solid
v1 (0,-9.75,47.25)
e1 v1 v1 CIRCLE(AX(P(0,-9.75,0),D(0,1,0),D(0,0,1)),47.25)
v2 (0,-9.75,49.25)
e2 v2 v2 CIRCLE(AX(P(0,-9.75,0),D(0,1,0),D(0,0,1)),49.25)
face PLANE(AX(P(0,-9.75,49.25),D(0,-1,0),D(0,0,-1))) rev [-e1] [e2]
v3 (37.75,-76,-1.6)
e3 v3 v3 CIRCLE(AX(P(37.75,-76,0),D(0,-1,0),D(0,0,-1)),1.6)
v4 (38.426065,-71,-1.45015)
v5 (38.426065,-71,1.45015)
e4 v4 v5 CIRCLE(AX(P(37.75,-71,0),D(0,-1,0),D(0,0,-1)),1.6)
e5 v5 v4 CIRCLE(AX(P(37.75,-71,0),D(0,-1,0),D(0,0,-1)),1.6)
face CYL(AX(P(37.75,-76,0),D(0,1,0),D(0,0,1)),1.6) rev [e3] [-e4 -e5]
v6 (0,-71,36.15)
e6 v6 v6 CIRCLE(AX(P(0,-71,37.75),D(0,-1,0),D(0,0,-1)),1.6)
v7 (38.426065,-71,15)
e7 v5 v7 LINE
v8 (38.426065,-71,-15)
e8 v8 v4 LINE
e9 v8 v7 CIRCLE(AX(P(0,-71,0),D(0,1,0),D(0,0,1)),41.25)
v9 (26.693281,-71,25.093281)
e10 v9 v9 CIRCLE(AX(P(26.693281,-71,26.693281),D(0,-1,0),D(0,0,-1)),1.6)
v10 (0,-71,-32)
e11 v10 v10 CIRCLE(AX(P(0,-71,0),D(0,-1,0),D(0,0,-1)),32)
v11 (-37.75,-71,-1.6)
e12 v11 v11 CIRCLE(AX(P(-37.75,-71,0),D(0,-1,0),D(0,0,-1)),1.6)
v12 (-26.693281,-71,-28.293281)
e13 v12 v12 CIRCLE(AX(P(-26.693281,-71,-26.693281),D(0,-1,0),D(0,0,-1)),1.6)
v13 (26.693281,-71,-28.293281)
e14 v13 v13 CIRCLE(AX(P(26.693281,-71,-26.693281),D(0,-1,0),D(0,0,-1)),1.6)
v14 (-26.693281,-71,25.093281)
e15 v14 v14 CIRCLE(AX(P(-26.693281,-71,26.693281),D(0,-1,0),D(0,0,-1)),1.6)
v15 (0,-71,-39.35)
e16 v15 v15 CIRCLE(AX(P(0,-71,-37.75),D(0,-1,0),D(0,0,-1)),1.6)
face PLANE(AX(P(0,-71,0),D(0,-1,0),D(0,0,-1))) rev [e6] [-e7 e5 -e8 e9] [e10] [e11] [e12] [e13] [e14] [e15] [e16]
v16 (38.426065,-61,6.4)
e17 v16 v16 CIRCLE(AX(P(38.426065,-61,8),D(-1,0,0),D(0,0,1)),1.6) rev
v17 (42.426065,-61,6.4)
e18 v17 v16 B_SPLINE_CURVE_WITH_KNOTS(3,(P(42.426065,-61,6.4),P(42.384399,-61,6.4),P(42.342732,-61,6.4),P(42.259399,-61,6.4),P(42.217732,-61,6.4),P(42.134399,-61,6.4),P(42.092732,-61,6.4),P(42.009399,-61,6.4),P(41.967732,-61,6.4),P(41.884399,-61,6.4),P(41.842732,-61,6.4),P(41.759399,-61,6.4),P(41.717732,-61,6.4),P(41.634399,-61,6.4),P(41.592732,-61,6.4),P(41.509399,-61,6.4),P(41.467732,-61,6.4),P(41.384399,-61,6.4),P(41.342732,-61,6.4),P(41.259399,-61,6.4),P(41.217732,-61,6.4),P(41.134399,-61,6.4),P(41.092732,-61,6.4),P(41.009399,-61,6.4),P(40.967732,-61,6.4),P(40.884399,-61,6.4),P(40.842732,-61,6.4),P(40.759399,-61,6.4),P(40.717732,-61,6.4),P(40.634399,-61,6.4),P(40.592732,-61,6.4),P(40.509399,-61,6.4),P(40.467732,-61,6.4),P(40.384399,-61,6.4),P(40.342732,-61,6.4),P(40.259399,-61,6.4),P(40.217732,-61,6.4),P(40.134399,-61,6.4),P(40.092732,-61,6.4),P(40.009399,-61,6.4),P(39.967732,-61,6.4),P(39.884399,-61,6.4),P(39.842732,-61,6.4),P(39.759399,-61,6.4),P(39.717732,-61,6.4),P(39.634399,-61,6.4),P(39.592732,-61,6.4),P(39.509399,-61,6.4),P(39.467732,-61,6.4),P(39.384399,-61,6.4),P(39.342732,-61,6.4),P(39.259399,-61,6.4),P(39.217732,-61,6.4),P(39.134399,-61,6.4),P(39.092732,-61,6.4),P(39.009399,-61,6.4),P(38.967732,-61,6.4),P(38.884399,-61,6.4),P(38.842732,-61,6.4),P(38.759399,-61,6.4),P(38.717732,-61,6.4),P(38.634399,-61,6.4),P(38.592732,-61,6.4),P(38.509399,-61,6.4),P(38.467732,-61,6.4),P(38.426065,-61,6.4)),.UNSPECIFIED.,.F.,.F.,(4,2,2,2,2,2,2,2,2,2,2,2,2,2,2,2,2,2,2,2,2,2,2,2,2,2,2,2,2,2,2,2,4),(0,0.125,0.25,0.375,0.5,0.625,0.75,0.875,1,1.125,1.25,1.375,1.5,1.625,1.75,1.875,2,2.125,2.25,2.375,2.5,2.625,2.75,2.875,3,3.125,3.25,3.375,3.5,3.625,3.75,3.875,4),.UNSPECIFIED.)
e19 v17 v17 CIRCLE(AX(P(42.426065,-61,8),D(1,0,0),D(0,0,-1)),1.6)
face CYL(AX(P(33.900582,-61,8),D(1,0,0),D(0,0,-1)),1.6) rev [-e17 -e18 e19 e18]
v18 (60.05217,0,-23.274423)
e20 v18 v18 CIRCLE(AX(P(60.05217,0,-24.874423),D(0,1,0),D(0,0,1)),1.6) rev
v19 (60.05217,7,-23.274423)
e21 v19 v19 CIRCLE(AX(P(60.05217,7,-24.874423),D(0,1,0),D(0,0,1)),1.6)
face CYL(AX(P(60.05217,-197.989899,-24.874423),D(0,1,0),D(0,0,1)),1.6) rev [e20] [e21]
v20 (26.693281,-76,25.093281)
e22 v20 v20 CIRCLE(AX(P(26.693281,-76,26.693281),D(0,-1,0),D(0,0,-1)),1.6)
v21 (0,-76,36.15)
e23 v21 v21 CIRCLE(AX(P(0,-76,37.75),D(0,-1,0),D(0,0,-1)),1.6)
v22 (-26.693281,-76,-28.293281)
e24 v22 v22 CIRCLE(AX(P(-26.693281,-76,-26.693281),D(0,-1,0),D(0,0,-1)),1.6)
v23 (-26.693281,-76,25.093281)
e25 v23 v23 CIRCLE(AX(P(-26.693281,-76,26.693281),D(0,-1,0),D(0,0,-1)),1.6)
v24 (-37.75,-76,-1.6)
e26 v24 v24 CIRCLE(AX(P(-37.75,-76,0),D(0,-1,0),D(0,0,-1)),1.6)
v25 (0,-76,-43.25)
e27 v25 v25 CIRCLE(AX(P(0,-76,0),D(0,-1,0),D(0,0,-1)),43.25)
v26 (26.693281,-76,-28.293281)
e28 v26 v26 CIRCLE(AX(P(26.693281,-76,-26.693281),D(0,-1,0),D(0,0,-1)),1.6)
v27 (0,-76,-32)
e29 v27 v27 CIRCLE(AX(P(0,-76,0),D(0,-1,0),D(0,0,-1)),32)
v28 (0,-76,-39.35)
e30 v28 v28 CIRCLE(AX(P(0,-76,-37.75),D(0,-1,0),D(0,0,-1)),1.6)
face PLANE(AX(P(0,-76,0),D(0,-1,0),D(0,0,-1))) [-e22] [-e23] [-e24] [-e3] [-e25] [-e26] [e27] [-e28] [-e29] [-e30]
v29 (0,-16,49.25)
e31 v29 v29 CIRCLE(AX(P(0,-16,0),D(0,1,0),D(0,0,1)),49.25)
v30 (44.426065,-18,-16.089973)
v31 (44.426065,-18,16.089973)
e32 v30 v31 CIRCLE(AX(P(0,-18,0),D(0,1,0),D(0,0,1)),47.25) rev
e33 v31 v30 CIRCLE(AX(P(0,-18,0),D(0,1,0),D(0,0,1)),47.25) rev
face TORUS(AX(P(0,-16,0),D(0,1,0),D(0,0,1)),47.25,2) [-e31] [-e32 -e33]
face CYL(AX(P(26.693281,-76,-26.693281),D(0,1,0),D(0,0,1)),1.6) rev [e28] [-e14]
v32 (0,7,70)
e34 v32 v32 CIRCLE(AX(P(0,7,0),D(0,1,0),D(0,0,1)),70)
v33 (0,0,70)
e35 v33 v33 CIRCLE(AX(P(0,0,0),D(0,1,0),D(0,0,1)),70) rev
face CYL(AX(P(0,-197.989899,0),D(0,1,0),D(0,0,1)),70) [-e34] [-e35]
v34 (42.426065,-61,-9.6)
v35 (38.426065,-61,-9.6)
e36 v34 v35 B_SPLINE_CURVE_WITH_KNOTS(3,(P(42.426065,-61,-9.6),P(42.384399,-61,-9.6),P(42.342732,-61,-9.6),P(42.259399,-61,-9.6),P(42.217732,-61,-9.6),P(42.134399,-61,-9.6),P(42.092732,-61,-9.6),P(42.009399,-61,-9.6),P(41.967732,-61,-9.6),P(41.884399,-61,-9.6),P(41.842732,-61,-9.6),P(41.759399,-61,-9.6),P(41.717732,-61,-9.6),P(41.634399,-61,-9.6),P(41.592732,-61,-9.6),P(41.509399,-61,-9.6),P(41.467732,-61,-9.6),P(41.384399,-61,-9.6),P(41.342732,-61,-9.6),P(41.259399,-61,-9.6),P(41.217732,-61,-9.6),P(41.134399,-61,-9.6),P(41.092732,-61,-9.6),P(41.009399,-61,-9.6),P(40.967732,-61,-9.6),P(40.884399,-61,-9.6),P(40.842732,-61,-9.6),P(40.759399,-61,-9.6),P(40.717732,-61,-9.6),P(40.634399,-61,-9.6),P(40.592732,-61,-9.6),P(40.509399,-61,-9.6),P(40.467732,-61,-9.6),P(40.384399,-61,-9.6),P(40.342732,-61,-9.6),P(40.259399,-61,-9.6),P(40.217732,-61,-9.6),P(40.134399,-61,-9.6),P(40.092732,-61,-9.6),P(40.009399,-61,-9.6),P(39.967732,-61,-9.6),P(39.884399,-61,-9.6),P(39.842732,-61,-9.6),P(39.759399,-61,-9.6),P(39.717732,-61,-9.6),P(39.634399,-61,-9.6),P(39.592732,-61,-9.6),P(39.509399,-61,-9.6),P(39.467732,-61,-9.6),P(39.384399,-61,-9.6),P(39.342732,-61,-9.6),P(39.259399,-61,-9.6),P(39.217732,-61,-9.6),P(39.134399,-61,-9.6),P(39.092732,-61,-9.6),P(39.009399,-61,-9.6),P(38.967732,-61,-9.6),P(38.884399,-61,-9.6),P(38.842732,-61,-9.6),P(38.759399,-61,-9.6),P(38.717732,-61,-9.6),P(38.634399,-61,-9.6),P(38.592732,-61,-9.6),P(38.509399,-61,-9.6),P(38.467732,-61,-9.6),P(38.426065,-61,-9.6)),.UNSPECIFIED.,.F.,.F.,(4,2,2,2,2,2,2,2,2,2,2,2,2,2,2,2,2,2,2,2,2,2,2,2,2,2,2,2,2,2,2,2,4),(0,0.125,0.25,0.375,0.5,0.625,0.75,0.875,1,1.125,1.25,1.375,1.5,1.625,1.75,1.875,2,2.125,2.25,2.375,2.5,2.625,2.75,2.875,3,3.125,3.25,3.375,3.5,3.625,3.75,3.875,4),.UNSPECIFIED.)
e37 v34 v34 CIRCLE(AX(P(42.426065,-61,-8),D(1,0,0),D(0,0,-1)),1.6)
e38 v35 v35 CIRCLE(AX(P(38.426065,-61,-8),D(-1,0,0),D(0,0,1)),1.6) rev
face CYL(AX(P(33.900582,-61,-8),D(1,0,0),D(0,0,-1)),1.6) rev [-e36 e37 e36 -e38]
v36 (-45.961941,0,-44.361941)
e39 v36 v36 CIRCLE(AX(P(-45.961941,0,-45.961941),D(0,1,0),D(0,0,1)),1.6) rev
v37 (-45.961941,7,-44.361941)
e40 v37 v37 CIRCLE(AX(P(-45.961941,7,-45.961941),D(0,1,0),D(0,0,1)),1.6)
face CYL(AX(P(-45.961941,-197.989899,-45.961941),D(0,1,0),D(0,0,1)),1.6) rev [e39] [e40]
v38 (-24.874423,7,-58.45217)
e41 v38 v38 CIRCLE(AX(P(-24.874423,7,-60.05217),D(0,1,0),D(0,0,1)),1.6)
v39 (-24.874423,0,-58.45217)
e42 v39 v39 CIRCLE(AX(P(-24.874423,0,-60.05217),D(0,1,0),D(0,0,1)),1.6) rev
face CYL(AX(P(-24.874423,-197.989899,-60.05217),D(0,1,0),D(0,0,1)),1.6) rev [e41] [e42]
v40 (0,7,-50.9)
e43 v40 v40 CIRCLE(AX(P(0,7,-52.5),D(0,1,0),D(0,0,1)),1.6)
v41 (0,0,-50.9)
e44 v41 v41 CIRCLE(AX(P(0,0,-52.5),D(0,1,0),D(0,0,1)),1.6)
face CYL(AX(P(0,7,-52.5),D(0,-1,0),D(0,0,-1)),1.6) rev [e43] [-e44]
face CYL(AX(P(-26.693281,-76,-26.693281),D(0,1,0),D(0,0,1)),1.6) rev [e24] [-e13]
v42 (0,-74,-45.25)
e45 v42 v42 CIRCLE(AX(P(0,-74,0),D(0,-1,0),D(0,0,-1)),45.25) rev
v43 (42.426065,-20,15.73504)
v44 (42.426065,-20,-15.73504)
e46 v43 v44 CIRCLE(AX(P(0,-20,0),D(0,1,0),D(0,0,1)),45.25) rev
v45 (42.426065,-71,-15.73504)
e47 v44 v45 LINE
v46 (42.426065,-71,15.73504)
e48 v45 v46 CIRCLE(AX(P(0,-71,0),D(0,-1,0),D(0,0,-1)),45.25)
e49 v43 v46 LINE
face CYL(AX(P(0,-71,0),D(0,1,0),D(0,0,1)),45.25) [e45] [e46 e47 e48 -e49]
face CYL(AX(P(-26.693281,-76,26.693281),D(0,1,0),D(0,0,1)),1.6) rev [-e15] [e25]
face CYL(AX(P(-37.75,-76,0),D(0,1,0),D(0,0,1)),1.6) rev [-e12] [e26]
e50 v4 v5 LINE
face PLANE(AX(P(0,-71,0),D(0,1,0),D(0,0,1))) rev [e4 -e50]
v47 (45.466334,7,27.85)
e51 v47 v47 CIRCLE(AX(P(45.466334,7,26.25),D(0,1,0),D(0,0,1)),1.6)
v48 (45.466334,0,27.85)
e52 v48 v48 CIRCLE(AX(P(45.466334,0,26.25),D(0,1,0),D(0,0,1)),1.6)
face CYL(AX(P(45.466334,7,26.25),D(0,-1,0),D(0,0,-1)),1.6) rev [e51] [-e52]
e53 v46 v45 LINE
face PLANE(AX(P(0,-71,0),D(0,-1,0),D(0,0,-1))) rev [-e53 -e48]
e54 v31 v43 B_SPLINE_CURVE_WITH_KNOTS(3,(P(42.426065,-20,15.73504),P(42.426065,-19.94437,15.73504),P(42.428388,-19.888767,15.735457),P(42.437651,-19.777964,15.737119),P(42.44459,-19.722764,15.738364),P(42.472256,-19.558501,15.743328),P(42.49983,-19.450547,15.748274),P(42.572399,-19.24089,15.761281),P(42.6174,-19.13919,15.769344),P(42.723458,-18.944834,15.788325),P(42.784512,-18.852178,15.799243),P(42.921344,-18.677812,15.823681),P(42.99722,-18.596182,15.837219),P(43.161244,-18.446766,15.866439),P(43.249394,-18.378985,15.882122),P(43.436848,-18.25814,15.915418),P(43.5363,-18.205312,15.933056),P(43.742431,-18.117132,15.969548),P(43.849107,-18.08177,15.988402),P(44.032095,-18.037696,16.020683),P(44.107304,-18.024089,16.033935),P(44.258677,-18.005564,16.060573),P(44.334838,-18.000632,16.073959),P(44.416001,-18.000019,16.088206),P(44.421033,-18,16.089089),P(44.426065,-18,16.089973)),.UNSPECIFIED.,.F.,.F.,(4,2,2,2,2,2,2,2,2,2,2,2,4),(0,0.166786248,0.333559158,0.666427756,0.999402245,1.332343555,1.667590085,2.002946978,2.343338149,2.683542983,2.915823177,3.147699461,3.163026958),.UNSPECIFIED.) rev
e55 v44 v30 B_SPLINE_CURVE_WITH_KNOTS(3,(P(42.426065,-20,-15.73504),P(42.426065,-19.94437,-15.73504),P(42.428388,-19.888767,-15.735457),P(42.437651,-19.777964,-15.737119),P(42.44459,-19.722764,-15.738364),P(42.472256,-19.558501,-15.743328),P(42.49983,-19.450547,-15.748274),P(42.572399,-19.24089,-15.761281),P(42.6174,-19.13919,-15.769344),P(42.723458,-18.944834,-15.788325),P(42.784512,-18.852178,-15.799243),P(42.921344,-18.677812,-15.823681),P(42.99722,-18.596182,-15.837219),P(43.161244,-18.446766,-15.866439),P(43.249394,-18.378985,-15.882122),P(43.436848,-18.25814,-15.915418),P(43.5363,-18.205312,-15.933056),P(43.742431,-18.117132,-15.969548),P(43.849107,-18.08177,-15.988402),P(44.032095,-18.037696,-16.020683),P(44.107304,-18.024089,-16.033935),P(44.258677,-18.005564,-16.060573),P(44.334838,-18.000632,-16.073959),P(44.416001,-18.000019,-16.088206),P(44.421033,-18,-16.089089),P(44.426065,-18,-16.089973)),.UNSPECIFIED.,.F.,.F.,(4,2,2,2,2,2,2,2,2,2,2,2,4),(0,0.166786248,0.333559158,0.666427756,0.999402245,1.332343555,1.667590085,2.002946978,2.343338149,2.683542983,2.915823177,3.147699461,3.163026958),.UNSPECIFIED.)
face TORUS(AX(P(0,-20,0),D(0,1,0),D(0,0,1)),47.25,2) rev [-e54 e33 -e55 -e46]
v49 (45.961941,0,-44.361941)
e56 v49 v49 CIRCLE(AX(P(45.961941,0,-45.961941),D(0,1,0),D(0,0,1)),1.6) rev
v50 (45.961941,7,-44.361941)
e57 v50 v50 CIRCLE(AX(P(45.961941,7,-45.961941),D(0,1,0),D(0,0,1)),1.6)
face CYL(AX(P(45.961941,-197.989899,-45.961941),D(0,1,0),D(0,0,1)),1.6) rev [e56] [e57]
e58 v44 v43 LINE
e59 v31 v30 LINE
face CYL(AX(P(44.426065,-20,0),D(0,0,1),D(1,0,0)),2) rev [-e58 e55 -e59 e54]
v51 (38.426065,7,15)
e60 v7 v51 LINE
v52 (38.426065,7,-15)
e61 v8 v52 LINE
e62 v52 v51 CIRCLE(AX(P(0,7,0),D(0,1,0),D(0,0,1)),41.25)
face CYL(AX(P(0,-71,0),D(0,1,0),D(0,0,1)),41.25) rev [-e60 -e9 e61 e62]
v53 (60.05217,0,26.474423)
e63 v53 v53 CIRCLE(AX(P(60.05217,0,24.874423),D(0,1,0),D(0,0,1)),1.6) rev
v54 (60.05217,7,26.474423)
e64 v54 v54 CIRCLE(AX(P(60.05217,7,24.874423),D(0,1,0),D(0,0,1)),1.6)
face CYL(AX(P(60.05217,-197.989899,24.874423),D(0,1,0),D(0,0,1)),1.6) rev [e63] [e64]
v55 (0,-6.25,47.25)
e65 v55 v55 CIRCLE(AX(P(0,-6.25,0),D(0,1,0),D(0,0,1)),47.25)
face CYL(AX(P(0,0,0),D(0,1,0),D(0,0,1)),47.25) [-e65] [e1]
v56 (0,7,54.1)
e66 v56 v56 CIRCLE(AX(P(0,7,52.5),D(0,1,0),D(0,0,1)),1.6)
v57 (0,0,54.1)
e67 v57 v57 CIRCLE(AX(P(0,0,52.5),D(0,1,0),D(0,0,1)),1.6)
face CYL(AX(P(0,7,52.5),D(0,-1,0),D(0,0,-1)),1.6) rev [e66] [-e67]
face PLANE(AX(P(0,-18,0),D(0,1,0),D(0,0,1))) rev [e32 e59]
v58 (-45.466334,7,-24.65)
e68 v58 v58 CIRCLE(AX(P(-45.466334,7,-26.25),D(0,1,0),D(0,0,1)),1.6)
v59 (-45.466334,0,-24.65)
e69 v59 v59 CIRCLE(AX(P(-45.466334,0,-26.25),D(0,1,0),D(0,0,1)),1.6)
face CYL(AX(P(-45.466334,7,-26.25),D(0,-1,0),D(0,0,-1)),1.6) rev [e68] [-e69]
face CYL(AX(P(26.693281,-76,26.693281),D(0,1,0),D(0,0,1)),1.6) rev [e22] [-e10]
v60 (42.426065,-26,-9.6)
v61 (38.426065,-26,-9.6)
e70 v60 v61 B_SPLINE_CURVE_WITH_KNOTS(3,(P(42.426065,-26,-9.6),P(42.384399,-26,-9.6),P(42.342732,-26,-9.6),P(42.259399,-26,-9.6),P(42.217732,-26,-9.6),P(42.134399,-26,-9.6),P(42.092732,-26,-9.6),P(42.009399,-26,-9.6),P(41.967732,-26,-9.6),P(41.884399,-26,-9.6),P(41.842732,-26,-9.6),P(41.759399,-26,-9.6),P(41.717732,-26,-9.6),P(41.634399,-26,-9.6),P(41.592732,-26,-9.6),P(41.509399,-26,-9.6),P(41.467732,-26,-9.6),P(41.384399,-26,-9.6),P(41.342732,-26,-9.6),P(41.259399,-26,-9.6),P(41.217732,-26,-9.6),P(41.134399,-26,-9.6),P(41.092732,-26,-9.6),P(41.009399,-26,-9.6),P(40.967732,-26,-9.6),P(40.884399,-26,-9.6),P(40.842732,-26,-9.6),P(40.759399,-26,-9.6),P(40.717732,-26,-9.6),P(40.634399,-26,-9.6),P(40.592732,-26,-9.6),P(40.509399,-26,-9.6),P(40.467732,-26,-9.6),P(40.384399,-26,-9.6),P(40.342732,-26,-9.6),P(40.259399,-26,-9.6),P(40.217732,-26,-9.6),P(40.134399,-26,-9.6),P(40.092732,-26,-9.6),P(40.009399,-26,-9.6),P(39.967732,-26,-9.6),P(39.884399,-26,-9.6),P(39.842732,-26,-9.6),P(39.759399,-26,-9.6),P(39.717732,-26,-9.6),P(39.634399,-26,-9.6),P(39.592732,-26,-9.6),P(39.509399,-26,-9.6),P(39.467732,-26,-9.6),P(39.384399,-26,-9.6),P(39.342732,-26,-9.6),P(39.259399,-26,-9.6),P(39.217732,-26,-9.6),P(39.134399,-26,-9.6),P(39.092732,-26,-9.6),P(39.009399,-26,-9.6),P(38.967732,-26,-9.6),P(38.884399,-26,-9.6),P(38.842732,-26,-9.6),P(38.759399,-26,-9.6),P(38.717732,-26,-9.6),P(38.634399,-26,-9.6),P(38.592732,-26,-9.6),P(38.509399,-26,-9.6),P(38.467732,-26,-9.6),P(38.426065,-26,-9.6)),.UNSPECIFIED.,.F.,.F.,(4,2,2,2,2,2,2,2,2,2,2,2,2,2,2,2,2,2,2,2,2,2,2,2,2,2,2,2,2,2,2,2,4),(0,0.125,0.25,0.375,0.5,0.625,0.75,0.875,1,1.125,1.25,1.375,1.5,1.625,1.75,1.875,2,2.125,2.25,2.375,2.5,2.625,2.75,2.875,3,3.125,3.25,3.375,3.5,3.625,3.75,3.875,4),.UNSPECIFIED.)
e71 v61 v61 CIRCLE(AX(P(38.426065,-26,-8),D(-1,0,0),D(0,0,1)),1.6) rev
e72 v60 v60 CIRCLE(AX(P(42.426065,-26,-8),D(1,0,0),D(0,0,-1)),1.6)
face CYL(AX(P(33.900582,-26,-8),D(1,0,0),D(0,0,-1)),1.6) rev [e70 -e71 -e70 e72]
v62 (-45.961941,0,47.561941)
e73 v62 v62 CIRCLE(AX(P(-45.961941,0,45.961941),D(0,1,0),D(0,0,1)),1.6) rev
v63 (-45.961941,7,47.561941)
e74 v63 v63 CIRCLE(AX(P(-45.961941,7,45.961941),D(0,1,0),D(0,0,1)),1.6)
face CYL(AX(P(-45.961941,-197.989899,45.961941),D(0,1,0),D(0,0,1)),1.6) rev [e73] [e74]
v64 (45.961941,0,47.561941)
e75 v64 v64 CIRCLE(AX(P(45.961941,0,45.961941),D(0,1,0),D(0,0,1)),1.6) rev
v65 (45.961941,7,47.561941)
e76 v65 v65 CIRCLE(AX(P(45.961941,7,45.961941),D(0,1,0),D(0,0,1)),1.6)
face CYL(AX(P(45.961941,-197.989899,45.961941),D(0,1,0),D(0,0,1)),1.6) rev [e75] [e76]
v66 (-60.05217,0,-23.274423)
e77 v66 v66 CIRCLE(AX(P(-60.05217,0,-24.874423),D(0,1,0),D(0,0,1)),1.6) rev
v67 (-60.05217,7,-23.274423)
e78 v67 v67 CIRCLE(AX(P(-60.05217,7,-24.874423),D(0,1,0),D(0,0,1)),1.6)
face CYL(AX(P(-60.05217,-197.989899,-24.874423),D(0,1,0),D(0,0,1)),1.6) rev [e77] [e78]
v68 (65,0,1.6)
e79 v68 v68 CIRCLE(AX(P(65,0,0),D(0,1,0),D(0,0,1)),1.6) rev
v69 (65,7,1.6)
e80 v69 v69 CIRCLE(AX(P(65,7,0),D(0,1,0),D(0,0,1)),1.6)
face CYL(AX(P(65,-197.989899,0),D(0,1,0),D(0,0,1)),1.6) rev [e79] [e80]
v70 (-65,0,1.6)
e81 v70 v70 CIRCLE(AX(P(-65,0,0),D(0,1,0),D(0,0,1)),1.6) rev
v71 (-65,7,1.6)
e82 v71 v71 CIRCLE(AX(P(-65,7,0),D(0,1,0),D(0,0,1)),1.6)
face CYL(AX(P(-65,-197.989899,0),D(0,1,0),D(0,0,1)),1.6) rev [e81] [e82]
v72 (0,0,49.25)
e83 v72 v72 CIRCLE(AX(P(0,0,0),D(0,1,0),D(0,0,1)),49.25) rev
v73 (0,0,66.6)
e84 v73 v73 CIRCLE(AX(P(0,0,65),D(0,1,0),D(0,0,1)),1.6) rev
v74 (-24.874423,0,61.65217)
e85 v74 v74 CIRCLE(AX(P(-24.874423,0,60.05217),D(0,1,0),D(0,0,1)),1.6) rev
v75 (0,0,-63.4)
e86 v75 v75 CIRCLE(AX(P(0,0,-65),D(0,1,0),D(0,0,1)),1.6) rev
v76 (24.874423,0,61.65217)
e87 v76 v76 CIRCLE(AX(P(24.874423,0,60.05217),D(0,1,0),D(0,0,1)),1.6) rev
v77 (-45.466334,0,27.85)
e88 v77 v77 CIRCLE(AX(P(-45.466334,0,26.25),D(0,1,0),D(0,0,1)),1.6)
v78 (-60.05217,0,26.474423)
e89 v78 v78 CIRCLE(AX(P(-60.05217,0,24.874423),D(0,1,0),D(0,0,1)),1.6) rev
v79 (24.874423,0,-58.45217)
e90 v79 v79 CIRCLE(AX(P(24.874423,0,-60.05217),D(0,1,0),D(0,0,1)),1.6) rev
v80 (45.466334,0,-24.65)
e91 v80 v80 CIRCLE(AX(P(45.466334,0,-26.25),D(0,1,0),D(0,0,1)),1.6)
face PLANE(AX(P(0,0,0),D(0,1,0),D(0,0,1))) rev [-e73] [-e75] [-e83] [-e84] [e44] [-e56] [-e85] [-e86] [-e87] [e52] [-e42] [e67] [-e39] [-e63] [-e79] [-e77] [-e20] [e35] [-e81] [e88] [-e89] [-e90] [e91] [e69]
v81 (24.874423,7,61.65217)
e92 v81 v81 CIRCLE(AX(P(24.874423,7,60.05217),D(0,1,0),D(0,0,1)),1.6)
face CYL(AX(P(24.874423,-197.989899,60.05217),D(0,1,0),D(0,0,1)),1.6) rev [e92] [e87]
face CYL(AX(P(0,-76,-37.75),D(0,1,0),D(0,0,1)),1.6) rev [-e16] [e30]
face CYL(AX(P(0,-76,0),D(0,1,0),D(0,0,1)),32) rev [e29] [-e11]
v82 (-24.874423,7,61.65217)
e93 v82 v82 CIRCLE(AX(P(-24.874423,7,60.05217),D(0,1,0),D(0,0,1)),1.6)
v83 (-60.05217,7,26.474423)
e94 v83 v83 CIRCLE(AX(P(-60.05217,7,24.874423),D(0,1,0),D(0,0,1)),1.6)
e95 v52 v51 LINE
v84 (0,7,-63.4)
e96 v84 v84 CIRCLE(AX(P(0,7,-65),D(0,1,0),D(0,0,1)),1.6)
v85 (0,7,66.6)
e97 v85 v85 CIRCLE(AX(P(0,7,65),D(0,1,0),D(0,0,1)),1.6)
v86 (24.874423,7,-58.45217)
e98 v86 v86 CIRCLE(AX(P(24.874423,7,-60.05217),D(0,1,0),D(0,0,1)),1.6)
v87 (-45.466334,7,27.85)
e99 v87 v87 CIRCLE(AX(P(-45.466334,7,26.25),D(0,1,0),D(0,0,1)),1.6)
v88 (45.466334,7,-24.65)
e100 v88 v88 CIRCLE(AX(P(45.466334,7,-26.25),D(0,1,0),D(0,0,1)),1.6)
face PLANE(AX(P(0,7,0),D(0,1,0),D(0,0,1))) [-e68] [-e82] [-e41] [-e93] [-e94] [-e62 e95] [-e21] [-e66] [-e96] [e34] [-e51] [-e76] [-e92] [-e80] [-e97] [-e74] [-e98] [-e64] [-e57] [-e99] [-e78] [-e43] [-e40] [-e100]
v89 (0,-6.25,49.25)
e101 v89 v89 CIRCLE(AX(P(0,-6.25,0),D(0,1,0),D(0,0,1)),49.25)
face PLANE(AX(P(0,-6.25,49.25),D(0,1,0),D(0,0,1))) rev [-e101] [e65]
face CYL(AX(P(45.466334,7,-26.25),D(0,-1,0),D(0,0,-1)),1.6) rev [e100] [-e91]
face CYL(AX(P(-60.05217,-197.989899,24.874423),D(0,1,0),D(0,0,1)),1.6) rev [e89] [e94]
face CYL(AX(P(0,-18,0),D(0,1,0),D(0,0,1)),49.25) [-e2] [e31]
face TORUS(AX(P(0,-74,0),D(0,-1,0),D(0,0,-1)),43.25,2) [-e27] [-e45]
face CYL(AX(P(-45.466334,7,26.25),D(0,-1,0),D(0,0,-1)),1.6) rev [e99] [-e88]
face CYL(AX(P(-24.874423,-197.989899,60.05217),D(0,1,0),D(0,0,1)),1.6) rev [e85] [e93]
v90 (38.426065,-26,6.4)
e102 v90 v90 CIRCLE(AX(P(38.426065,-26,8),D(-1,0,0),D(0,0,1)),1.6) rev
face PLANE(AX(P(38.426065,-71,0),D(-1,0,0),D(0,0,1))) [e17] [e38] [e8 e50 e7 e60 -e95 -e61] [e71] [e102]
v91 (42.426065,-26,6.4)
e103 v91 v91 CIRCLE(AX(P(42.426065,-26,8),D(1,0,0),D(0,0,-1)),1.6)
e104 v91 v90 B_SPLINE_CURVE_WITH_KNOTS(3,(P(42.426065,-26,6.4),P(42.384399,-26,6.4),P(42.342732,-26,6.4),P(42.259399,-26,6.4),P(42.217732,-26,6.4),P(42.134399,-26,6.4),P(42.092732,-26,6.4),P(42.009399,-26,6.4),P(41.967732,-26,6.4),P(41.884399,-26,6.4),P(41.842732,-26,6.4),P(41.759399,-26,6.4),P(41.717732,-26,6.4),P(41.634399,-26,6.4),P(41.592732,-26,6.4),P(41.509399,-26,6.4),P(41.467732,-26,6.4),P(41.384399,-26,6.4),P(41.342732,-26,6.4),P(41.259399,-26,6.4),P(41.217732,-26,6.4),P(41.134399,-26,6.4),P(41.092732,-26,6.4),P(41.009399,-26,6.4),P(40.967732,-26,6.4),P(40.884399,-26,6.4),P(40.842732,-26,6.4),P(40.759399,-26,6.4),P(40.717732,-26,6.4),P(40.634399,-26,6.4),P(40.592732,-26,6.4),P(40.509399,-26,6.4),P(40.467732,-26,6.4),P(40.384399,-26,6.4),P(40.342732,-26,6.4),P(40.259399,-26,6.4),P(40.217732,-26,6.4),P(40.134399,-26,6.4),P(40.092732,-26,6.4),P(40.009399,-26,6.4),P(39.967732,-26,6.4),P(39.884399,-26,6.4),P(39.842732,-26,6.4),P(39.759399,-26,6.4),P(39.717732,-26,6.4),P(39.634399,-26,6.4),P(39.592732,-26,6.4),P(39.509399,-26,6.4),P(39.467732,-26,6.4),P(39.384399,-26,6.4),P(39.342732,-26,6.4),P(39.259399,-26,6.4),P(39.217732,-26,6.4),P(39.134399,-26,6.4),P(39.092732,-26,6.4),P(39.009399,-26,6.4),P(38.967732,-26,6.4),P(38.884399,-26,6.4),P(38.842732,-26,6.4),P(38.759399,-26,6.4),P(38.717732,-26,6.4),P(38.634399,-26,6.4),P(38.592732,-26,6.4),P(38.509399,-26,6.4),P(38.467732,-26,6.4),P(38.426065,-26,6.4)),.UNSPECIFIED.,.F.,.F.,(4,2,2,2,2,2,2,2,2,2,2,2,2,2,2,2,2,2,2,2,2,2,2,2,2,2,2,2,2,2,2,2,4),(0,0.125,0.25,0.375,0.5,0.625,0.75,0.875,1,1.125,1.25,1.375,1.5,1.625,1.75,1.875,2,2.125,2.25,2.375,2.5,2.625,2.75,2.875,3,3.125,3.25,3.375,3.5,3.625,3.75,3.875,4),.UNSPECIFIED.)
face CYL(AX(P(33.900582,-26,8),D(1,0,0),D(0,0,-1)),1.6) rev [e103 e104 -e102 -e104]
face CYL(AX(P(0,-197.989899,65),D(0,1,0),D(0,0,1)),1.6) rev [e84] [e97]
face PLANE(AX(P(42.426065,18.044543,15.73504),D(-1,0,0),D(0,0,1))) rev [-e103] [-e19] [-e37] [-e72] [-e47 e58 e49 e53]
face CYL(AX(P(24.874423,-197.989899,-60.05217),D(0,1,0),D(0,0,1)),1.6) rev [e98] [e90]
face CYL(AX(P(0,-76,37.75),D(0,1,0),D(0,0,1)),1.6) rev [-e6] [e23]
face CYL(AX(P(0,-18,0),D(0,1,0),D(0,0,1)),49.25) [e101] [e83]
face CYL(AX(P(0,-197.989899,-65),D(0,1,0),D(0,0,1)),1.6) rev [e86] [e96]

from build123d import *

# Parameters (mm, degrees)
SKETCH1_R           = 60
SKETCH1_R_2         = 49.25
SKETCH1_R_3         = 1.6
BOSS_EXTRUDE1_DEPTH = 7
BOSS_EXTRUDE2_START = -25
SKETCH2_R           = 49.25
SKETCH2_R_2         = 45.25
BOSS_EXTRUDE2_DEPTH = 25
BOSS_EXTRUDE5_START = -78
SKETCH6_R           = 45.25
BOSS_EXTRUDE5_DEPTH = 78
SKETCH7_W           = 17.573934628
SKETCH7_H           = 31.47007957
CUT_EXTRUDE3_DEPTH  = 53
BOSS_EXTRUDE6_START = 5
SKETCH8_R           = 45.25
SKETCH8_R_2         = 32
SKETCH8_R_3         = 1.6
BOSS_EXTRUDE6_DEPTH = 5
SKETCH9_R           = 1.6
CUT_EXTRUDE4_DEPTH  = 4
FILLET1_R           = 2
SKETCH10_W          = 2
SKETCH10_H          = 3.5
BOSS_EXTRUDE7_START = -7
SKETCH11_R          = 70
SKETCH11_R_2        = 60
SKETCH11_R_3        = 1.6
BOSS_EXTRUDE7_DEPTH = 7


with BuildPart() as part:
    # Sketch1 → Boss-Extrude1 (new body)
    with BuildSketch(Plane(origin=(0, 0, 0), x_dir=(1, 0, 0), z_dir=(0, 1, 0))):
        with Locations(Location((0, 0, 0), (0, 0, 270))):
            Circle(SKETCH1_R)
        with Locations(Location((0, 0, 0), (0, 0, 270))):
            Circle(SKETCH1_R_2, mode=Mode.SUBTRACT)
        with Locations(Location((0, 52.5, 0), (0, 0, 270))):
            Circle(SKETCH1_R_3, mode=Mode.SUBTRACT)
        with Locations(Location((45.466333699, 26.25, 0), (0, 0, 270))):
            Circle(SKETCH1_R_3, mode=Mode.SUBTRACT)
        with Locations(Location((45.466333699, -26.25, 0), (0, 0, 270))):
            Circle(SKETCH1_R_3, mode=Mode.SUBTRACT)
        with Locations(Location((0, -52.5, 0), (0, 0, 270))):
            Circle(SKETCH1_R_3, mode=Mode.SUBTRACT)
        with Locations(Location((-45.466333699, -26.25, 0), (0, 0, 270))):
            Circle(SKETCH1_R_3, mode=Mode.SUBTRACT)
        with Locations(Location((-45.466333699, 26.25, 0), (0, 0, 270))):
            Circle(SKETCH1_R_3, mode=Mode.SUBTRACT)
    extrude(amount=BOSS_EXTRUDE1_DEPTH)

    # Sketch2 → Boss-Extrude2 (add)
    with BuildSketch(Plane(origin=(0, 7, 0), x_dir=(1, 0, 0), z_dir=(0, 1, 0)).offset(BOSS_EXTRUDE2_START)):
        with Locations(Location((0, 0, 0), (0, 0, 270))):
            Circle(SKETCH2_R)
        with Locations(Location((0, 0, 0), (0, 0, 270))):
            Circle(SKETCH2_R_2, mode=Mode.SUBTRACT)
    extrude(amount=BOSS_EXTRUDE2_DEPTH)

    # Sketch6 → Boss-Extrude5 (add)
    with BuildSketch(Plane(origin=(0, 7, 0), x_dir=(1, 0, 0), z_dir=(0, 1, 0)).offset(BOSS_EXTRUDE5_START)):
        with Locations(Location((0, 0, 0), (0, 0, 270))):
            Circle(SKETCH6_R)
        with BuildLine():
            ThreePointArc((38.426065372, -15), (-41.25, 0), (38.426065372, 15))
            Line((38.426065372, 15), (38.426065372, -15))
        make_face(mode=Mode.SUBTRACT)
    extrude(amount=BOSS_EXTRUDE5_DEPTH)

    # Sketch7 → Cut-Extrude3 (cut)
    with BuildSketch(Plane.XZ.offset(71)):
        with Locations((51.213032686, 0)):
            Rectangle(SKETCH7_W, SKETCH7_H)
    extrude(amount=-CUT_EXTRUDE3_DEPTH, mode=Mode.SUBTRACT)

    # Sketch8 → Boss-Extrude6 (add)
    with BuildSketch(Plane.XZ.offset(71).offset(BOSS_EXTRUDE6_START)):
        with Locations(Location((0, 0, 0), (0, 0, 20.348881936))):
            Circle(SKETCH8_R)
        with Locations(Location((0, 0, 0), (0, 0, 270))):
            Circle(SKETCH8_R_2, mode=Mode.SUBTRACT)
        with Locations(Location((26.69328099, 26.69328099, 0), (0, 0, 270))):
            Circle(SKETCH8_R_3, mode=Mode.SUBTRACT)
        with Locations(Location((37.75, 0, 0), (0, 0, 65.0048933))):
            Circle(SKETCH8_R_3, mode=Mode.SUBTRACT)
        with Locations(Location((26.69328099, -26.69328099, 0), (0, 0, 270))):
            Circle(SKETCH8_R_3, mode=Mode.SUBTRACT)
        with Locations(Location((0, -37.75, 0), (0, 0, 270))):
            Circle(SKETCH8_R_3, mode=Mode.SUBTRACT)
        with Locations(Location((-26.69328099, -26.69328099, 0), (0, 0, 270))):
            Circle(SKETCH8_R_3, mode=Mode.SUBTRACT)
        with Locations(Location((-37.75, 0, 0), (0, 0, 270))):
            Circle(SKETCH8_R_3, mode=Mode.SUBTRACT)
        with Locations(Location((-26.69328099, 26.69328099, 0), (0, 0, 270))):
            Circle(SKETCH8_R_3, mode=Mode.SUBTRACT)
        with Locations(Location((0, 37.75, 0), (0, 0, 270))):
            Circle(SKETCH8_R_3, mode=Mode.SUBTRACT)
    extrude(amount=-BOSS_EXTRUDE6_DEPTH)

    # Sketch9 → Cut-Extrude4 (cut)
    with BuildSketch(Plane(origin=(42.426065372, 0, 0), x_dir=(0, 0, -1), z_dir=(1, 0, 0))):
        with Locations((-8, -26)):
            Circle(SKETCH9_R)
        with Locations((8, -26)):
            Circle(SKETCH9_R)
        with Locations((8, -61)):
            Circle(SKETCH9_R)
        with Locations((-8, -61)):
            Circle(SKETCH9_R)
    extrude(amount=-CUT_EXTRUDE4_DEPTH, mode=Mode.SUBTRACT)

    # Fillet1
    fillet1_edges = [part.edges().sort_by_distance(p)[0] for p in [
        (0, -18, -49.25),
        (-45.25, -18, 0),
        (42.426065372, -18, 0),
        (-42.426065372, -76, -15.735039784),
    ]]
    fillet(fillet1_edges, radius=FILLET1_R - 0.0001)  # a hair under: the kernel refuses the full size

    # Sketch10 → Cut-Revolve1 (revolve, cut)
    with BuildSketch(Plane(origin=(0, 0, 0), x_dir=(0, 0, -1), z_dir=(1, 0, 0))):
        with Locations((-48.25, -8)):
            Rectangle(SKETCH10_W, SKETCH10_H)
    revolve(axis=Axis((0, 0, 0), (0, -1, 0)), mode=Mode.SUBTRACT)

    # Sketch11 → Boss-Extrude7 (add)
    with BuildSketch(Plane(origin=(0, 7, 0), x_dir=(1, 0, 0), z_dir=(0, 1, 0)).offset(BOSS_EXTRUDE7_START)):
        with Locations(Location((0, 0, 0), (0, 0, 270))):
            Circle(SKETCH11_R)
        Circle(SKETCH11_R_2, mode=Mode.SUBTRACT)
        with Locations(Location((0, 65, 0), (0, 0, 270))):
            Circle(SKETCH11_R_3, mode=Mode.SUBTRACT)
        with Locations(Location((24.874423104, 60.052169613, 0), (0, 0, 270))):
            Circle(SKETCH11_R_3, mode=Mode.SUBTRACT)
        with Locations(Location((45.961940777, 45.961940777, 0), (0, 0, 270))):
            Circle(SKETCH11_R_3, mode=Mode.SUBTRACT)
        with Locations(Location((60.052169613, 24.874423104, 0), (0, 0, 270))):
            Circle(SKETCH11_R_3, mode=Mode.SUBTRACT)
        with Locations(Location((65, 0, 0), (0, 0, 270))):
            Circle(SKETCH11_R_3, mode=Mode.SUBTRACT)
        with Locations(Location((60.052169613, -24.874423104, 0), (0, 0, 270))):
            Circle(SKETCH11_R_3, mode=Mode.SUBTRACT)
        with Locations(Location((45.961940777, -45.961940777, 0), (0, 0, 270))):
            Circle(SKETCH11_R_3, mode=Mode.SUBTRACT)
        with Locations(Location((24.874423104, -60.052169613, 0), (0, 0, 270))):
            Circle(SKETCH11_R_3, mode=Mode.SUBTRACT)
        with Locations(Location((0, -65, 0), (0, 0, 270))):
            Circle(SKETCH11_R_3, mode=Mode.SUBTRACT)
        with Locations(Location((-24.874423104, -60.052169613, 0), (0, 0, 270))):
            Circle(SKETCH11_R_3, mode=Mode.SUBTRACT)
        with Locations(Location((-45.961940777, -45.961940777, 0), (0, 0, 270))):
            Circle(SKETCH11_R_3, mode=Mode.SUBTRACT)
        with Locations(Location((-60.052169613, -24.874423104, 0), (0, 0, 270))):
            Circle(SKETCH11_R_3, mode=Mode.SUBTRACT)
        with Locations(Location((-65, 0, 0), (0, 0, 270))):
            Circle(SKETCH11_R_3, mode=Mode.SUBTRACT)
        with Locations(Location((-60.052169613, 24.874423104, 0), (0, 0, 270))):
            Circle(SKETCH11_R_3, mode=Mode.SUBTRACT)
        with Locations(Location((-45.961940777, 45.961940777, 0), (0, 0, 270))):
            Circle(SKETCH11_R_3, mode=Mode.SUBTRACT)
        with Locations(Location((-24.874423104, 60.052169613, 0), (0, 0, 270))):
            Circle(SKETCH11_R_3, mode=Mode.SUBTRACT)
    extrude(amount=BOSS_EXTRUDE7_DEPTH)


solid = part.part
